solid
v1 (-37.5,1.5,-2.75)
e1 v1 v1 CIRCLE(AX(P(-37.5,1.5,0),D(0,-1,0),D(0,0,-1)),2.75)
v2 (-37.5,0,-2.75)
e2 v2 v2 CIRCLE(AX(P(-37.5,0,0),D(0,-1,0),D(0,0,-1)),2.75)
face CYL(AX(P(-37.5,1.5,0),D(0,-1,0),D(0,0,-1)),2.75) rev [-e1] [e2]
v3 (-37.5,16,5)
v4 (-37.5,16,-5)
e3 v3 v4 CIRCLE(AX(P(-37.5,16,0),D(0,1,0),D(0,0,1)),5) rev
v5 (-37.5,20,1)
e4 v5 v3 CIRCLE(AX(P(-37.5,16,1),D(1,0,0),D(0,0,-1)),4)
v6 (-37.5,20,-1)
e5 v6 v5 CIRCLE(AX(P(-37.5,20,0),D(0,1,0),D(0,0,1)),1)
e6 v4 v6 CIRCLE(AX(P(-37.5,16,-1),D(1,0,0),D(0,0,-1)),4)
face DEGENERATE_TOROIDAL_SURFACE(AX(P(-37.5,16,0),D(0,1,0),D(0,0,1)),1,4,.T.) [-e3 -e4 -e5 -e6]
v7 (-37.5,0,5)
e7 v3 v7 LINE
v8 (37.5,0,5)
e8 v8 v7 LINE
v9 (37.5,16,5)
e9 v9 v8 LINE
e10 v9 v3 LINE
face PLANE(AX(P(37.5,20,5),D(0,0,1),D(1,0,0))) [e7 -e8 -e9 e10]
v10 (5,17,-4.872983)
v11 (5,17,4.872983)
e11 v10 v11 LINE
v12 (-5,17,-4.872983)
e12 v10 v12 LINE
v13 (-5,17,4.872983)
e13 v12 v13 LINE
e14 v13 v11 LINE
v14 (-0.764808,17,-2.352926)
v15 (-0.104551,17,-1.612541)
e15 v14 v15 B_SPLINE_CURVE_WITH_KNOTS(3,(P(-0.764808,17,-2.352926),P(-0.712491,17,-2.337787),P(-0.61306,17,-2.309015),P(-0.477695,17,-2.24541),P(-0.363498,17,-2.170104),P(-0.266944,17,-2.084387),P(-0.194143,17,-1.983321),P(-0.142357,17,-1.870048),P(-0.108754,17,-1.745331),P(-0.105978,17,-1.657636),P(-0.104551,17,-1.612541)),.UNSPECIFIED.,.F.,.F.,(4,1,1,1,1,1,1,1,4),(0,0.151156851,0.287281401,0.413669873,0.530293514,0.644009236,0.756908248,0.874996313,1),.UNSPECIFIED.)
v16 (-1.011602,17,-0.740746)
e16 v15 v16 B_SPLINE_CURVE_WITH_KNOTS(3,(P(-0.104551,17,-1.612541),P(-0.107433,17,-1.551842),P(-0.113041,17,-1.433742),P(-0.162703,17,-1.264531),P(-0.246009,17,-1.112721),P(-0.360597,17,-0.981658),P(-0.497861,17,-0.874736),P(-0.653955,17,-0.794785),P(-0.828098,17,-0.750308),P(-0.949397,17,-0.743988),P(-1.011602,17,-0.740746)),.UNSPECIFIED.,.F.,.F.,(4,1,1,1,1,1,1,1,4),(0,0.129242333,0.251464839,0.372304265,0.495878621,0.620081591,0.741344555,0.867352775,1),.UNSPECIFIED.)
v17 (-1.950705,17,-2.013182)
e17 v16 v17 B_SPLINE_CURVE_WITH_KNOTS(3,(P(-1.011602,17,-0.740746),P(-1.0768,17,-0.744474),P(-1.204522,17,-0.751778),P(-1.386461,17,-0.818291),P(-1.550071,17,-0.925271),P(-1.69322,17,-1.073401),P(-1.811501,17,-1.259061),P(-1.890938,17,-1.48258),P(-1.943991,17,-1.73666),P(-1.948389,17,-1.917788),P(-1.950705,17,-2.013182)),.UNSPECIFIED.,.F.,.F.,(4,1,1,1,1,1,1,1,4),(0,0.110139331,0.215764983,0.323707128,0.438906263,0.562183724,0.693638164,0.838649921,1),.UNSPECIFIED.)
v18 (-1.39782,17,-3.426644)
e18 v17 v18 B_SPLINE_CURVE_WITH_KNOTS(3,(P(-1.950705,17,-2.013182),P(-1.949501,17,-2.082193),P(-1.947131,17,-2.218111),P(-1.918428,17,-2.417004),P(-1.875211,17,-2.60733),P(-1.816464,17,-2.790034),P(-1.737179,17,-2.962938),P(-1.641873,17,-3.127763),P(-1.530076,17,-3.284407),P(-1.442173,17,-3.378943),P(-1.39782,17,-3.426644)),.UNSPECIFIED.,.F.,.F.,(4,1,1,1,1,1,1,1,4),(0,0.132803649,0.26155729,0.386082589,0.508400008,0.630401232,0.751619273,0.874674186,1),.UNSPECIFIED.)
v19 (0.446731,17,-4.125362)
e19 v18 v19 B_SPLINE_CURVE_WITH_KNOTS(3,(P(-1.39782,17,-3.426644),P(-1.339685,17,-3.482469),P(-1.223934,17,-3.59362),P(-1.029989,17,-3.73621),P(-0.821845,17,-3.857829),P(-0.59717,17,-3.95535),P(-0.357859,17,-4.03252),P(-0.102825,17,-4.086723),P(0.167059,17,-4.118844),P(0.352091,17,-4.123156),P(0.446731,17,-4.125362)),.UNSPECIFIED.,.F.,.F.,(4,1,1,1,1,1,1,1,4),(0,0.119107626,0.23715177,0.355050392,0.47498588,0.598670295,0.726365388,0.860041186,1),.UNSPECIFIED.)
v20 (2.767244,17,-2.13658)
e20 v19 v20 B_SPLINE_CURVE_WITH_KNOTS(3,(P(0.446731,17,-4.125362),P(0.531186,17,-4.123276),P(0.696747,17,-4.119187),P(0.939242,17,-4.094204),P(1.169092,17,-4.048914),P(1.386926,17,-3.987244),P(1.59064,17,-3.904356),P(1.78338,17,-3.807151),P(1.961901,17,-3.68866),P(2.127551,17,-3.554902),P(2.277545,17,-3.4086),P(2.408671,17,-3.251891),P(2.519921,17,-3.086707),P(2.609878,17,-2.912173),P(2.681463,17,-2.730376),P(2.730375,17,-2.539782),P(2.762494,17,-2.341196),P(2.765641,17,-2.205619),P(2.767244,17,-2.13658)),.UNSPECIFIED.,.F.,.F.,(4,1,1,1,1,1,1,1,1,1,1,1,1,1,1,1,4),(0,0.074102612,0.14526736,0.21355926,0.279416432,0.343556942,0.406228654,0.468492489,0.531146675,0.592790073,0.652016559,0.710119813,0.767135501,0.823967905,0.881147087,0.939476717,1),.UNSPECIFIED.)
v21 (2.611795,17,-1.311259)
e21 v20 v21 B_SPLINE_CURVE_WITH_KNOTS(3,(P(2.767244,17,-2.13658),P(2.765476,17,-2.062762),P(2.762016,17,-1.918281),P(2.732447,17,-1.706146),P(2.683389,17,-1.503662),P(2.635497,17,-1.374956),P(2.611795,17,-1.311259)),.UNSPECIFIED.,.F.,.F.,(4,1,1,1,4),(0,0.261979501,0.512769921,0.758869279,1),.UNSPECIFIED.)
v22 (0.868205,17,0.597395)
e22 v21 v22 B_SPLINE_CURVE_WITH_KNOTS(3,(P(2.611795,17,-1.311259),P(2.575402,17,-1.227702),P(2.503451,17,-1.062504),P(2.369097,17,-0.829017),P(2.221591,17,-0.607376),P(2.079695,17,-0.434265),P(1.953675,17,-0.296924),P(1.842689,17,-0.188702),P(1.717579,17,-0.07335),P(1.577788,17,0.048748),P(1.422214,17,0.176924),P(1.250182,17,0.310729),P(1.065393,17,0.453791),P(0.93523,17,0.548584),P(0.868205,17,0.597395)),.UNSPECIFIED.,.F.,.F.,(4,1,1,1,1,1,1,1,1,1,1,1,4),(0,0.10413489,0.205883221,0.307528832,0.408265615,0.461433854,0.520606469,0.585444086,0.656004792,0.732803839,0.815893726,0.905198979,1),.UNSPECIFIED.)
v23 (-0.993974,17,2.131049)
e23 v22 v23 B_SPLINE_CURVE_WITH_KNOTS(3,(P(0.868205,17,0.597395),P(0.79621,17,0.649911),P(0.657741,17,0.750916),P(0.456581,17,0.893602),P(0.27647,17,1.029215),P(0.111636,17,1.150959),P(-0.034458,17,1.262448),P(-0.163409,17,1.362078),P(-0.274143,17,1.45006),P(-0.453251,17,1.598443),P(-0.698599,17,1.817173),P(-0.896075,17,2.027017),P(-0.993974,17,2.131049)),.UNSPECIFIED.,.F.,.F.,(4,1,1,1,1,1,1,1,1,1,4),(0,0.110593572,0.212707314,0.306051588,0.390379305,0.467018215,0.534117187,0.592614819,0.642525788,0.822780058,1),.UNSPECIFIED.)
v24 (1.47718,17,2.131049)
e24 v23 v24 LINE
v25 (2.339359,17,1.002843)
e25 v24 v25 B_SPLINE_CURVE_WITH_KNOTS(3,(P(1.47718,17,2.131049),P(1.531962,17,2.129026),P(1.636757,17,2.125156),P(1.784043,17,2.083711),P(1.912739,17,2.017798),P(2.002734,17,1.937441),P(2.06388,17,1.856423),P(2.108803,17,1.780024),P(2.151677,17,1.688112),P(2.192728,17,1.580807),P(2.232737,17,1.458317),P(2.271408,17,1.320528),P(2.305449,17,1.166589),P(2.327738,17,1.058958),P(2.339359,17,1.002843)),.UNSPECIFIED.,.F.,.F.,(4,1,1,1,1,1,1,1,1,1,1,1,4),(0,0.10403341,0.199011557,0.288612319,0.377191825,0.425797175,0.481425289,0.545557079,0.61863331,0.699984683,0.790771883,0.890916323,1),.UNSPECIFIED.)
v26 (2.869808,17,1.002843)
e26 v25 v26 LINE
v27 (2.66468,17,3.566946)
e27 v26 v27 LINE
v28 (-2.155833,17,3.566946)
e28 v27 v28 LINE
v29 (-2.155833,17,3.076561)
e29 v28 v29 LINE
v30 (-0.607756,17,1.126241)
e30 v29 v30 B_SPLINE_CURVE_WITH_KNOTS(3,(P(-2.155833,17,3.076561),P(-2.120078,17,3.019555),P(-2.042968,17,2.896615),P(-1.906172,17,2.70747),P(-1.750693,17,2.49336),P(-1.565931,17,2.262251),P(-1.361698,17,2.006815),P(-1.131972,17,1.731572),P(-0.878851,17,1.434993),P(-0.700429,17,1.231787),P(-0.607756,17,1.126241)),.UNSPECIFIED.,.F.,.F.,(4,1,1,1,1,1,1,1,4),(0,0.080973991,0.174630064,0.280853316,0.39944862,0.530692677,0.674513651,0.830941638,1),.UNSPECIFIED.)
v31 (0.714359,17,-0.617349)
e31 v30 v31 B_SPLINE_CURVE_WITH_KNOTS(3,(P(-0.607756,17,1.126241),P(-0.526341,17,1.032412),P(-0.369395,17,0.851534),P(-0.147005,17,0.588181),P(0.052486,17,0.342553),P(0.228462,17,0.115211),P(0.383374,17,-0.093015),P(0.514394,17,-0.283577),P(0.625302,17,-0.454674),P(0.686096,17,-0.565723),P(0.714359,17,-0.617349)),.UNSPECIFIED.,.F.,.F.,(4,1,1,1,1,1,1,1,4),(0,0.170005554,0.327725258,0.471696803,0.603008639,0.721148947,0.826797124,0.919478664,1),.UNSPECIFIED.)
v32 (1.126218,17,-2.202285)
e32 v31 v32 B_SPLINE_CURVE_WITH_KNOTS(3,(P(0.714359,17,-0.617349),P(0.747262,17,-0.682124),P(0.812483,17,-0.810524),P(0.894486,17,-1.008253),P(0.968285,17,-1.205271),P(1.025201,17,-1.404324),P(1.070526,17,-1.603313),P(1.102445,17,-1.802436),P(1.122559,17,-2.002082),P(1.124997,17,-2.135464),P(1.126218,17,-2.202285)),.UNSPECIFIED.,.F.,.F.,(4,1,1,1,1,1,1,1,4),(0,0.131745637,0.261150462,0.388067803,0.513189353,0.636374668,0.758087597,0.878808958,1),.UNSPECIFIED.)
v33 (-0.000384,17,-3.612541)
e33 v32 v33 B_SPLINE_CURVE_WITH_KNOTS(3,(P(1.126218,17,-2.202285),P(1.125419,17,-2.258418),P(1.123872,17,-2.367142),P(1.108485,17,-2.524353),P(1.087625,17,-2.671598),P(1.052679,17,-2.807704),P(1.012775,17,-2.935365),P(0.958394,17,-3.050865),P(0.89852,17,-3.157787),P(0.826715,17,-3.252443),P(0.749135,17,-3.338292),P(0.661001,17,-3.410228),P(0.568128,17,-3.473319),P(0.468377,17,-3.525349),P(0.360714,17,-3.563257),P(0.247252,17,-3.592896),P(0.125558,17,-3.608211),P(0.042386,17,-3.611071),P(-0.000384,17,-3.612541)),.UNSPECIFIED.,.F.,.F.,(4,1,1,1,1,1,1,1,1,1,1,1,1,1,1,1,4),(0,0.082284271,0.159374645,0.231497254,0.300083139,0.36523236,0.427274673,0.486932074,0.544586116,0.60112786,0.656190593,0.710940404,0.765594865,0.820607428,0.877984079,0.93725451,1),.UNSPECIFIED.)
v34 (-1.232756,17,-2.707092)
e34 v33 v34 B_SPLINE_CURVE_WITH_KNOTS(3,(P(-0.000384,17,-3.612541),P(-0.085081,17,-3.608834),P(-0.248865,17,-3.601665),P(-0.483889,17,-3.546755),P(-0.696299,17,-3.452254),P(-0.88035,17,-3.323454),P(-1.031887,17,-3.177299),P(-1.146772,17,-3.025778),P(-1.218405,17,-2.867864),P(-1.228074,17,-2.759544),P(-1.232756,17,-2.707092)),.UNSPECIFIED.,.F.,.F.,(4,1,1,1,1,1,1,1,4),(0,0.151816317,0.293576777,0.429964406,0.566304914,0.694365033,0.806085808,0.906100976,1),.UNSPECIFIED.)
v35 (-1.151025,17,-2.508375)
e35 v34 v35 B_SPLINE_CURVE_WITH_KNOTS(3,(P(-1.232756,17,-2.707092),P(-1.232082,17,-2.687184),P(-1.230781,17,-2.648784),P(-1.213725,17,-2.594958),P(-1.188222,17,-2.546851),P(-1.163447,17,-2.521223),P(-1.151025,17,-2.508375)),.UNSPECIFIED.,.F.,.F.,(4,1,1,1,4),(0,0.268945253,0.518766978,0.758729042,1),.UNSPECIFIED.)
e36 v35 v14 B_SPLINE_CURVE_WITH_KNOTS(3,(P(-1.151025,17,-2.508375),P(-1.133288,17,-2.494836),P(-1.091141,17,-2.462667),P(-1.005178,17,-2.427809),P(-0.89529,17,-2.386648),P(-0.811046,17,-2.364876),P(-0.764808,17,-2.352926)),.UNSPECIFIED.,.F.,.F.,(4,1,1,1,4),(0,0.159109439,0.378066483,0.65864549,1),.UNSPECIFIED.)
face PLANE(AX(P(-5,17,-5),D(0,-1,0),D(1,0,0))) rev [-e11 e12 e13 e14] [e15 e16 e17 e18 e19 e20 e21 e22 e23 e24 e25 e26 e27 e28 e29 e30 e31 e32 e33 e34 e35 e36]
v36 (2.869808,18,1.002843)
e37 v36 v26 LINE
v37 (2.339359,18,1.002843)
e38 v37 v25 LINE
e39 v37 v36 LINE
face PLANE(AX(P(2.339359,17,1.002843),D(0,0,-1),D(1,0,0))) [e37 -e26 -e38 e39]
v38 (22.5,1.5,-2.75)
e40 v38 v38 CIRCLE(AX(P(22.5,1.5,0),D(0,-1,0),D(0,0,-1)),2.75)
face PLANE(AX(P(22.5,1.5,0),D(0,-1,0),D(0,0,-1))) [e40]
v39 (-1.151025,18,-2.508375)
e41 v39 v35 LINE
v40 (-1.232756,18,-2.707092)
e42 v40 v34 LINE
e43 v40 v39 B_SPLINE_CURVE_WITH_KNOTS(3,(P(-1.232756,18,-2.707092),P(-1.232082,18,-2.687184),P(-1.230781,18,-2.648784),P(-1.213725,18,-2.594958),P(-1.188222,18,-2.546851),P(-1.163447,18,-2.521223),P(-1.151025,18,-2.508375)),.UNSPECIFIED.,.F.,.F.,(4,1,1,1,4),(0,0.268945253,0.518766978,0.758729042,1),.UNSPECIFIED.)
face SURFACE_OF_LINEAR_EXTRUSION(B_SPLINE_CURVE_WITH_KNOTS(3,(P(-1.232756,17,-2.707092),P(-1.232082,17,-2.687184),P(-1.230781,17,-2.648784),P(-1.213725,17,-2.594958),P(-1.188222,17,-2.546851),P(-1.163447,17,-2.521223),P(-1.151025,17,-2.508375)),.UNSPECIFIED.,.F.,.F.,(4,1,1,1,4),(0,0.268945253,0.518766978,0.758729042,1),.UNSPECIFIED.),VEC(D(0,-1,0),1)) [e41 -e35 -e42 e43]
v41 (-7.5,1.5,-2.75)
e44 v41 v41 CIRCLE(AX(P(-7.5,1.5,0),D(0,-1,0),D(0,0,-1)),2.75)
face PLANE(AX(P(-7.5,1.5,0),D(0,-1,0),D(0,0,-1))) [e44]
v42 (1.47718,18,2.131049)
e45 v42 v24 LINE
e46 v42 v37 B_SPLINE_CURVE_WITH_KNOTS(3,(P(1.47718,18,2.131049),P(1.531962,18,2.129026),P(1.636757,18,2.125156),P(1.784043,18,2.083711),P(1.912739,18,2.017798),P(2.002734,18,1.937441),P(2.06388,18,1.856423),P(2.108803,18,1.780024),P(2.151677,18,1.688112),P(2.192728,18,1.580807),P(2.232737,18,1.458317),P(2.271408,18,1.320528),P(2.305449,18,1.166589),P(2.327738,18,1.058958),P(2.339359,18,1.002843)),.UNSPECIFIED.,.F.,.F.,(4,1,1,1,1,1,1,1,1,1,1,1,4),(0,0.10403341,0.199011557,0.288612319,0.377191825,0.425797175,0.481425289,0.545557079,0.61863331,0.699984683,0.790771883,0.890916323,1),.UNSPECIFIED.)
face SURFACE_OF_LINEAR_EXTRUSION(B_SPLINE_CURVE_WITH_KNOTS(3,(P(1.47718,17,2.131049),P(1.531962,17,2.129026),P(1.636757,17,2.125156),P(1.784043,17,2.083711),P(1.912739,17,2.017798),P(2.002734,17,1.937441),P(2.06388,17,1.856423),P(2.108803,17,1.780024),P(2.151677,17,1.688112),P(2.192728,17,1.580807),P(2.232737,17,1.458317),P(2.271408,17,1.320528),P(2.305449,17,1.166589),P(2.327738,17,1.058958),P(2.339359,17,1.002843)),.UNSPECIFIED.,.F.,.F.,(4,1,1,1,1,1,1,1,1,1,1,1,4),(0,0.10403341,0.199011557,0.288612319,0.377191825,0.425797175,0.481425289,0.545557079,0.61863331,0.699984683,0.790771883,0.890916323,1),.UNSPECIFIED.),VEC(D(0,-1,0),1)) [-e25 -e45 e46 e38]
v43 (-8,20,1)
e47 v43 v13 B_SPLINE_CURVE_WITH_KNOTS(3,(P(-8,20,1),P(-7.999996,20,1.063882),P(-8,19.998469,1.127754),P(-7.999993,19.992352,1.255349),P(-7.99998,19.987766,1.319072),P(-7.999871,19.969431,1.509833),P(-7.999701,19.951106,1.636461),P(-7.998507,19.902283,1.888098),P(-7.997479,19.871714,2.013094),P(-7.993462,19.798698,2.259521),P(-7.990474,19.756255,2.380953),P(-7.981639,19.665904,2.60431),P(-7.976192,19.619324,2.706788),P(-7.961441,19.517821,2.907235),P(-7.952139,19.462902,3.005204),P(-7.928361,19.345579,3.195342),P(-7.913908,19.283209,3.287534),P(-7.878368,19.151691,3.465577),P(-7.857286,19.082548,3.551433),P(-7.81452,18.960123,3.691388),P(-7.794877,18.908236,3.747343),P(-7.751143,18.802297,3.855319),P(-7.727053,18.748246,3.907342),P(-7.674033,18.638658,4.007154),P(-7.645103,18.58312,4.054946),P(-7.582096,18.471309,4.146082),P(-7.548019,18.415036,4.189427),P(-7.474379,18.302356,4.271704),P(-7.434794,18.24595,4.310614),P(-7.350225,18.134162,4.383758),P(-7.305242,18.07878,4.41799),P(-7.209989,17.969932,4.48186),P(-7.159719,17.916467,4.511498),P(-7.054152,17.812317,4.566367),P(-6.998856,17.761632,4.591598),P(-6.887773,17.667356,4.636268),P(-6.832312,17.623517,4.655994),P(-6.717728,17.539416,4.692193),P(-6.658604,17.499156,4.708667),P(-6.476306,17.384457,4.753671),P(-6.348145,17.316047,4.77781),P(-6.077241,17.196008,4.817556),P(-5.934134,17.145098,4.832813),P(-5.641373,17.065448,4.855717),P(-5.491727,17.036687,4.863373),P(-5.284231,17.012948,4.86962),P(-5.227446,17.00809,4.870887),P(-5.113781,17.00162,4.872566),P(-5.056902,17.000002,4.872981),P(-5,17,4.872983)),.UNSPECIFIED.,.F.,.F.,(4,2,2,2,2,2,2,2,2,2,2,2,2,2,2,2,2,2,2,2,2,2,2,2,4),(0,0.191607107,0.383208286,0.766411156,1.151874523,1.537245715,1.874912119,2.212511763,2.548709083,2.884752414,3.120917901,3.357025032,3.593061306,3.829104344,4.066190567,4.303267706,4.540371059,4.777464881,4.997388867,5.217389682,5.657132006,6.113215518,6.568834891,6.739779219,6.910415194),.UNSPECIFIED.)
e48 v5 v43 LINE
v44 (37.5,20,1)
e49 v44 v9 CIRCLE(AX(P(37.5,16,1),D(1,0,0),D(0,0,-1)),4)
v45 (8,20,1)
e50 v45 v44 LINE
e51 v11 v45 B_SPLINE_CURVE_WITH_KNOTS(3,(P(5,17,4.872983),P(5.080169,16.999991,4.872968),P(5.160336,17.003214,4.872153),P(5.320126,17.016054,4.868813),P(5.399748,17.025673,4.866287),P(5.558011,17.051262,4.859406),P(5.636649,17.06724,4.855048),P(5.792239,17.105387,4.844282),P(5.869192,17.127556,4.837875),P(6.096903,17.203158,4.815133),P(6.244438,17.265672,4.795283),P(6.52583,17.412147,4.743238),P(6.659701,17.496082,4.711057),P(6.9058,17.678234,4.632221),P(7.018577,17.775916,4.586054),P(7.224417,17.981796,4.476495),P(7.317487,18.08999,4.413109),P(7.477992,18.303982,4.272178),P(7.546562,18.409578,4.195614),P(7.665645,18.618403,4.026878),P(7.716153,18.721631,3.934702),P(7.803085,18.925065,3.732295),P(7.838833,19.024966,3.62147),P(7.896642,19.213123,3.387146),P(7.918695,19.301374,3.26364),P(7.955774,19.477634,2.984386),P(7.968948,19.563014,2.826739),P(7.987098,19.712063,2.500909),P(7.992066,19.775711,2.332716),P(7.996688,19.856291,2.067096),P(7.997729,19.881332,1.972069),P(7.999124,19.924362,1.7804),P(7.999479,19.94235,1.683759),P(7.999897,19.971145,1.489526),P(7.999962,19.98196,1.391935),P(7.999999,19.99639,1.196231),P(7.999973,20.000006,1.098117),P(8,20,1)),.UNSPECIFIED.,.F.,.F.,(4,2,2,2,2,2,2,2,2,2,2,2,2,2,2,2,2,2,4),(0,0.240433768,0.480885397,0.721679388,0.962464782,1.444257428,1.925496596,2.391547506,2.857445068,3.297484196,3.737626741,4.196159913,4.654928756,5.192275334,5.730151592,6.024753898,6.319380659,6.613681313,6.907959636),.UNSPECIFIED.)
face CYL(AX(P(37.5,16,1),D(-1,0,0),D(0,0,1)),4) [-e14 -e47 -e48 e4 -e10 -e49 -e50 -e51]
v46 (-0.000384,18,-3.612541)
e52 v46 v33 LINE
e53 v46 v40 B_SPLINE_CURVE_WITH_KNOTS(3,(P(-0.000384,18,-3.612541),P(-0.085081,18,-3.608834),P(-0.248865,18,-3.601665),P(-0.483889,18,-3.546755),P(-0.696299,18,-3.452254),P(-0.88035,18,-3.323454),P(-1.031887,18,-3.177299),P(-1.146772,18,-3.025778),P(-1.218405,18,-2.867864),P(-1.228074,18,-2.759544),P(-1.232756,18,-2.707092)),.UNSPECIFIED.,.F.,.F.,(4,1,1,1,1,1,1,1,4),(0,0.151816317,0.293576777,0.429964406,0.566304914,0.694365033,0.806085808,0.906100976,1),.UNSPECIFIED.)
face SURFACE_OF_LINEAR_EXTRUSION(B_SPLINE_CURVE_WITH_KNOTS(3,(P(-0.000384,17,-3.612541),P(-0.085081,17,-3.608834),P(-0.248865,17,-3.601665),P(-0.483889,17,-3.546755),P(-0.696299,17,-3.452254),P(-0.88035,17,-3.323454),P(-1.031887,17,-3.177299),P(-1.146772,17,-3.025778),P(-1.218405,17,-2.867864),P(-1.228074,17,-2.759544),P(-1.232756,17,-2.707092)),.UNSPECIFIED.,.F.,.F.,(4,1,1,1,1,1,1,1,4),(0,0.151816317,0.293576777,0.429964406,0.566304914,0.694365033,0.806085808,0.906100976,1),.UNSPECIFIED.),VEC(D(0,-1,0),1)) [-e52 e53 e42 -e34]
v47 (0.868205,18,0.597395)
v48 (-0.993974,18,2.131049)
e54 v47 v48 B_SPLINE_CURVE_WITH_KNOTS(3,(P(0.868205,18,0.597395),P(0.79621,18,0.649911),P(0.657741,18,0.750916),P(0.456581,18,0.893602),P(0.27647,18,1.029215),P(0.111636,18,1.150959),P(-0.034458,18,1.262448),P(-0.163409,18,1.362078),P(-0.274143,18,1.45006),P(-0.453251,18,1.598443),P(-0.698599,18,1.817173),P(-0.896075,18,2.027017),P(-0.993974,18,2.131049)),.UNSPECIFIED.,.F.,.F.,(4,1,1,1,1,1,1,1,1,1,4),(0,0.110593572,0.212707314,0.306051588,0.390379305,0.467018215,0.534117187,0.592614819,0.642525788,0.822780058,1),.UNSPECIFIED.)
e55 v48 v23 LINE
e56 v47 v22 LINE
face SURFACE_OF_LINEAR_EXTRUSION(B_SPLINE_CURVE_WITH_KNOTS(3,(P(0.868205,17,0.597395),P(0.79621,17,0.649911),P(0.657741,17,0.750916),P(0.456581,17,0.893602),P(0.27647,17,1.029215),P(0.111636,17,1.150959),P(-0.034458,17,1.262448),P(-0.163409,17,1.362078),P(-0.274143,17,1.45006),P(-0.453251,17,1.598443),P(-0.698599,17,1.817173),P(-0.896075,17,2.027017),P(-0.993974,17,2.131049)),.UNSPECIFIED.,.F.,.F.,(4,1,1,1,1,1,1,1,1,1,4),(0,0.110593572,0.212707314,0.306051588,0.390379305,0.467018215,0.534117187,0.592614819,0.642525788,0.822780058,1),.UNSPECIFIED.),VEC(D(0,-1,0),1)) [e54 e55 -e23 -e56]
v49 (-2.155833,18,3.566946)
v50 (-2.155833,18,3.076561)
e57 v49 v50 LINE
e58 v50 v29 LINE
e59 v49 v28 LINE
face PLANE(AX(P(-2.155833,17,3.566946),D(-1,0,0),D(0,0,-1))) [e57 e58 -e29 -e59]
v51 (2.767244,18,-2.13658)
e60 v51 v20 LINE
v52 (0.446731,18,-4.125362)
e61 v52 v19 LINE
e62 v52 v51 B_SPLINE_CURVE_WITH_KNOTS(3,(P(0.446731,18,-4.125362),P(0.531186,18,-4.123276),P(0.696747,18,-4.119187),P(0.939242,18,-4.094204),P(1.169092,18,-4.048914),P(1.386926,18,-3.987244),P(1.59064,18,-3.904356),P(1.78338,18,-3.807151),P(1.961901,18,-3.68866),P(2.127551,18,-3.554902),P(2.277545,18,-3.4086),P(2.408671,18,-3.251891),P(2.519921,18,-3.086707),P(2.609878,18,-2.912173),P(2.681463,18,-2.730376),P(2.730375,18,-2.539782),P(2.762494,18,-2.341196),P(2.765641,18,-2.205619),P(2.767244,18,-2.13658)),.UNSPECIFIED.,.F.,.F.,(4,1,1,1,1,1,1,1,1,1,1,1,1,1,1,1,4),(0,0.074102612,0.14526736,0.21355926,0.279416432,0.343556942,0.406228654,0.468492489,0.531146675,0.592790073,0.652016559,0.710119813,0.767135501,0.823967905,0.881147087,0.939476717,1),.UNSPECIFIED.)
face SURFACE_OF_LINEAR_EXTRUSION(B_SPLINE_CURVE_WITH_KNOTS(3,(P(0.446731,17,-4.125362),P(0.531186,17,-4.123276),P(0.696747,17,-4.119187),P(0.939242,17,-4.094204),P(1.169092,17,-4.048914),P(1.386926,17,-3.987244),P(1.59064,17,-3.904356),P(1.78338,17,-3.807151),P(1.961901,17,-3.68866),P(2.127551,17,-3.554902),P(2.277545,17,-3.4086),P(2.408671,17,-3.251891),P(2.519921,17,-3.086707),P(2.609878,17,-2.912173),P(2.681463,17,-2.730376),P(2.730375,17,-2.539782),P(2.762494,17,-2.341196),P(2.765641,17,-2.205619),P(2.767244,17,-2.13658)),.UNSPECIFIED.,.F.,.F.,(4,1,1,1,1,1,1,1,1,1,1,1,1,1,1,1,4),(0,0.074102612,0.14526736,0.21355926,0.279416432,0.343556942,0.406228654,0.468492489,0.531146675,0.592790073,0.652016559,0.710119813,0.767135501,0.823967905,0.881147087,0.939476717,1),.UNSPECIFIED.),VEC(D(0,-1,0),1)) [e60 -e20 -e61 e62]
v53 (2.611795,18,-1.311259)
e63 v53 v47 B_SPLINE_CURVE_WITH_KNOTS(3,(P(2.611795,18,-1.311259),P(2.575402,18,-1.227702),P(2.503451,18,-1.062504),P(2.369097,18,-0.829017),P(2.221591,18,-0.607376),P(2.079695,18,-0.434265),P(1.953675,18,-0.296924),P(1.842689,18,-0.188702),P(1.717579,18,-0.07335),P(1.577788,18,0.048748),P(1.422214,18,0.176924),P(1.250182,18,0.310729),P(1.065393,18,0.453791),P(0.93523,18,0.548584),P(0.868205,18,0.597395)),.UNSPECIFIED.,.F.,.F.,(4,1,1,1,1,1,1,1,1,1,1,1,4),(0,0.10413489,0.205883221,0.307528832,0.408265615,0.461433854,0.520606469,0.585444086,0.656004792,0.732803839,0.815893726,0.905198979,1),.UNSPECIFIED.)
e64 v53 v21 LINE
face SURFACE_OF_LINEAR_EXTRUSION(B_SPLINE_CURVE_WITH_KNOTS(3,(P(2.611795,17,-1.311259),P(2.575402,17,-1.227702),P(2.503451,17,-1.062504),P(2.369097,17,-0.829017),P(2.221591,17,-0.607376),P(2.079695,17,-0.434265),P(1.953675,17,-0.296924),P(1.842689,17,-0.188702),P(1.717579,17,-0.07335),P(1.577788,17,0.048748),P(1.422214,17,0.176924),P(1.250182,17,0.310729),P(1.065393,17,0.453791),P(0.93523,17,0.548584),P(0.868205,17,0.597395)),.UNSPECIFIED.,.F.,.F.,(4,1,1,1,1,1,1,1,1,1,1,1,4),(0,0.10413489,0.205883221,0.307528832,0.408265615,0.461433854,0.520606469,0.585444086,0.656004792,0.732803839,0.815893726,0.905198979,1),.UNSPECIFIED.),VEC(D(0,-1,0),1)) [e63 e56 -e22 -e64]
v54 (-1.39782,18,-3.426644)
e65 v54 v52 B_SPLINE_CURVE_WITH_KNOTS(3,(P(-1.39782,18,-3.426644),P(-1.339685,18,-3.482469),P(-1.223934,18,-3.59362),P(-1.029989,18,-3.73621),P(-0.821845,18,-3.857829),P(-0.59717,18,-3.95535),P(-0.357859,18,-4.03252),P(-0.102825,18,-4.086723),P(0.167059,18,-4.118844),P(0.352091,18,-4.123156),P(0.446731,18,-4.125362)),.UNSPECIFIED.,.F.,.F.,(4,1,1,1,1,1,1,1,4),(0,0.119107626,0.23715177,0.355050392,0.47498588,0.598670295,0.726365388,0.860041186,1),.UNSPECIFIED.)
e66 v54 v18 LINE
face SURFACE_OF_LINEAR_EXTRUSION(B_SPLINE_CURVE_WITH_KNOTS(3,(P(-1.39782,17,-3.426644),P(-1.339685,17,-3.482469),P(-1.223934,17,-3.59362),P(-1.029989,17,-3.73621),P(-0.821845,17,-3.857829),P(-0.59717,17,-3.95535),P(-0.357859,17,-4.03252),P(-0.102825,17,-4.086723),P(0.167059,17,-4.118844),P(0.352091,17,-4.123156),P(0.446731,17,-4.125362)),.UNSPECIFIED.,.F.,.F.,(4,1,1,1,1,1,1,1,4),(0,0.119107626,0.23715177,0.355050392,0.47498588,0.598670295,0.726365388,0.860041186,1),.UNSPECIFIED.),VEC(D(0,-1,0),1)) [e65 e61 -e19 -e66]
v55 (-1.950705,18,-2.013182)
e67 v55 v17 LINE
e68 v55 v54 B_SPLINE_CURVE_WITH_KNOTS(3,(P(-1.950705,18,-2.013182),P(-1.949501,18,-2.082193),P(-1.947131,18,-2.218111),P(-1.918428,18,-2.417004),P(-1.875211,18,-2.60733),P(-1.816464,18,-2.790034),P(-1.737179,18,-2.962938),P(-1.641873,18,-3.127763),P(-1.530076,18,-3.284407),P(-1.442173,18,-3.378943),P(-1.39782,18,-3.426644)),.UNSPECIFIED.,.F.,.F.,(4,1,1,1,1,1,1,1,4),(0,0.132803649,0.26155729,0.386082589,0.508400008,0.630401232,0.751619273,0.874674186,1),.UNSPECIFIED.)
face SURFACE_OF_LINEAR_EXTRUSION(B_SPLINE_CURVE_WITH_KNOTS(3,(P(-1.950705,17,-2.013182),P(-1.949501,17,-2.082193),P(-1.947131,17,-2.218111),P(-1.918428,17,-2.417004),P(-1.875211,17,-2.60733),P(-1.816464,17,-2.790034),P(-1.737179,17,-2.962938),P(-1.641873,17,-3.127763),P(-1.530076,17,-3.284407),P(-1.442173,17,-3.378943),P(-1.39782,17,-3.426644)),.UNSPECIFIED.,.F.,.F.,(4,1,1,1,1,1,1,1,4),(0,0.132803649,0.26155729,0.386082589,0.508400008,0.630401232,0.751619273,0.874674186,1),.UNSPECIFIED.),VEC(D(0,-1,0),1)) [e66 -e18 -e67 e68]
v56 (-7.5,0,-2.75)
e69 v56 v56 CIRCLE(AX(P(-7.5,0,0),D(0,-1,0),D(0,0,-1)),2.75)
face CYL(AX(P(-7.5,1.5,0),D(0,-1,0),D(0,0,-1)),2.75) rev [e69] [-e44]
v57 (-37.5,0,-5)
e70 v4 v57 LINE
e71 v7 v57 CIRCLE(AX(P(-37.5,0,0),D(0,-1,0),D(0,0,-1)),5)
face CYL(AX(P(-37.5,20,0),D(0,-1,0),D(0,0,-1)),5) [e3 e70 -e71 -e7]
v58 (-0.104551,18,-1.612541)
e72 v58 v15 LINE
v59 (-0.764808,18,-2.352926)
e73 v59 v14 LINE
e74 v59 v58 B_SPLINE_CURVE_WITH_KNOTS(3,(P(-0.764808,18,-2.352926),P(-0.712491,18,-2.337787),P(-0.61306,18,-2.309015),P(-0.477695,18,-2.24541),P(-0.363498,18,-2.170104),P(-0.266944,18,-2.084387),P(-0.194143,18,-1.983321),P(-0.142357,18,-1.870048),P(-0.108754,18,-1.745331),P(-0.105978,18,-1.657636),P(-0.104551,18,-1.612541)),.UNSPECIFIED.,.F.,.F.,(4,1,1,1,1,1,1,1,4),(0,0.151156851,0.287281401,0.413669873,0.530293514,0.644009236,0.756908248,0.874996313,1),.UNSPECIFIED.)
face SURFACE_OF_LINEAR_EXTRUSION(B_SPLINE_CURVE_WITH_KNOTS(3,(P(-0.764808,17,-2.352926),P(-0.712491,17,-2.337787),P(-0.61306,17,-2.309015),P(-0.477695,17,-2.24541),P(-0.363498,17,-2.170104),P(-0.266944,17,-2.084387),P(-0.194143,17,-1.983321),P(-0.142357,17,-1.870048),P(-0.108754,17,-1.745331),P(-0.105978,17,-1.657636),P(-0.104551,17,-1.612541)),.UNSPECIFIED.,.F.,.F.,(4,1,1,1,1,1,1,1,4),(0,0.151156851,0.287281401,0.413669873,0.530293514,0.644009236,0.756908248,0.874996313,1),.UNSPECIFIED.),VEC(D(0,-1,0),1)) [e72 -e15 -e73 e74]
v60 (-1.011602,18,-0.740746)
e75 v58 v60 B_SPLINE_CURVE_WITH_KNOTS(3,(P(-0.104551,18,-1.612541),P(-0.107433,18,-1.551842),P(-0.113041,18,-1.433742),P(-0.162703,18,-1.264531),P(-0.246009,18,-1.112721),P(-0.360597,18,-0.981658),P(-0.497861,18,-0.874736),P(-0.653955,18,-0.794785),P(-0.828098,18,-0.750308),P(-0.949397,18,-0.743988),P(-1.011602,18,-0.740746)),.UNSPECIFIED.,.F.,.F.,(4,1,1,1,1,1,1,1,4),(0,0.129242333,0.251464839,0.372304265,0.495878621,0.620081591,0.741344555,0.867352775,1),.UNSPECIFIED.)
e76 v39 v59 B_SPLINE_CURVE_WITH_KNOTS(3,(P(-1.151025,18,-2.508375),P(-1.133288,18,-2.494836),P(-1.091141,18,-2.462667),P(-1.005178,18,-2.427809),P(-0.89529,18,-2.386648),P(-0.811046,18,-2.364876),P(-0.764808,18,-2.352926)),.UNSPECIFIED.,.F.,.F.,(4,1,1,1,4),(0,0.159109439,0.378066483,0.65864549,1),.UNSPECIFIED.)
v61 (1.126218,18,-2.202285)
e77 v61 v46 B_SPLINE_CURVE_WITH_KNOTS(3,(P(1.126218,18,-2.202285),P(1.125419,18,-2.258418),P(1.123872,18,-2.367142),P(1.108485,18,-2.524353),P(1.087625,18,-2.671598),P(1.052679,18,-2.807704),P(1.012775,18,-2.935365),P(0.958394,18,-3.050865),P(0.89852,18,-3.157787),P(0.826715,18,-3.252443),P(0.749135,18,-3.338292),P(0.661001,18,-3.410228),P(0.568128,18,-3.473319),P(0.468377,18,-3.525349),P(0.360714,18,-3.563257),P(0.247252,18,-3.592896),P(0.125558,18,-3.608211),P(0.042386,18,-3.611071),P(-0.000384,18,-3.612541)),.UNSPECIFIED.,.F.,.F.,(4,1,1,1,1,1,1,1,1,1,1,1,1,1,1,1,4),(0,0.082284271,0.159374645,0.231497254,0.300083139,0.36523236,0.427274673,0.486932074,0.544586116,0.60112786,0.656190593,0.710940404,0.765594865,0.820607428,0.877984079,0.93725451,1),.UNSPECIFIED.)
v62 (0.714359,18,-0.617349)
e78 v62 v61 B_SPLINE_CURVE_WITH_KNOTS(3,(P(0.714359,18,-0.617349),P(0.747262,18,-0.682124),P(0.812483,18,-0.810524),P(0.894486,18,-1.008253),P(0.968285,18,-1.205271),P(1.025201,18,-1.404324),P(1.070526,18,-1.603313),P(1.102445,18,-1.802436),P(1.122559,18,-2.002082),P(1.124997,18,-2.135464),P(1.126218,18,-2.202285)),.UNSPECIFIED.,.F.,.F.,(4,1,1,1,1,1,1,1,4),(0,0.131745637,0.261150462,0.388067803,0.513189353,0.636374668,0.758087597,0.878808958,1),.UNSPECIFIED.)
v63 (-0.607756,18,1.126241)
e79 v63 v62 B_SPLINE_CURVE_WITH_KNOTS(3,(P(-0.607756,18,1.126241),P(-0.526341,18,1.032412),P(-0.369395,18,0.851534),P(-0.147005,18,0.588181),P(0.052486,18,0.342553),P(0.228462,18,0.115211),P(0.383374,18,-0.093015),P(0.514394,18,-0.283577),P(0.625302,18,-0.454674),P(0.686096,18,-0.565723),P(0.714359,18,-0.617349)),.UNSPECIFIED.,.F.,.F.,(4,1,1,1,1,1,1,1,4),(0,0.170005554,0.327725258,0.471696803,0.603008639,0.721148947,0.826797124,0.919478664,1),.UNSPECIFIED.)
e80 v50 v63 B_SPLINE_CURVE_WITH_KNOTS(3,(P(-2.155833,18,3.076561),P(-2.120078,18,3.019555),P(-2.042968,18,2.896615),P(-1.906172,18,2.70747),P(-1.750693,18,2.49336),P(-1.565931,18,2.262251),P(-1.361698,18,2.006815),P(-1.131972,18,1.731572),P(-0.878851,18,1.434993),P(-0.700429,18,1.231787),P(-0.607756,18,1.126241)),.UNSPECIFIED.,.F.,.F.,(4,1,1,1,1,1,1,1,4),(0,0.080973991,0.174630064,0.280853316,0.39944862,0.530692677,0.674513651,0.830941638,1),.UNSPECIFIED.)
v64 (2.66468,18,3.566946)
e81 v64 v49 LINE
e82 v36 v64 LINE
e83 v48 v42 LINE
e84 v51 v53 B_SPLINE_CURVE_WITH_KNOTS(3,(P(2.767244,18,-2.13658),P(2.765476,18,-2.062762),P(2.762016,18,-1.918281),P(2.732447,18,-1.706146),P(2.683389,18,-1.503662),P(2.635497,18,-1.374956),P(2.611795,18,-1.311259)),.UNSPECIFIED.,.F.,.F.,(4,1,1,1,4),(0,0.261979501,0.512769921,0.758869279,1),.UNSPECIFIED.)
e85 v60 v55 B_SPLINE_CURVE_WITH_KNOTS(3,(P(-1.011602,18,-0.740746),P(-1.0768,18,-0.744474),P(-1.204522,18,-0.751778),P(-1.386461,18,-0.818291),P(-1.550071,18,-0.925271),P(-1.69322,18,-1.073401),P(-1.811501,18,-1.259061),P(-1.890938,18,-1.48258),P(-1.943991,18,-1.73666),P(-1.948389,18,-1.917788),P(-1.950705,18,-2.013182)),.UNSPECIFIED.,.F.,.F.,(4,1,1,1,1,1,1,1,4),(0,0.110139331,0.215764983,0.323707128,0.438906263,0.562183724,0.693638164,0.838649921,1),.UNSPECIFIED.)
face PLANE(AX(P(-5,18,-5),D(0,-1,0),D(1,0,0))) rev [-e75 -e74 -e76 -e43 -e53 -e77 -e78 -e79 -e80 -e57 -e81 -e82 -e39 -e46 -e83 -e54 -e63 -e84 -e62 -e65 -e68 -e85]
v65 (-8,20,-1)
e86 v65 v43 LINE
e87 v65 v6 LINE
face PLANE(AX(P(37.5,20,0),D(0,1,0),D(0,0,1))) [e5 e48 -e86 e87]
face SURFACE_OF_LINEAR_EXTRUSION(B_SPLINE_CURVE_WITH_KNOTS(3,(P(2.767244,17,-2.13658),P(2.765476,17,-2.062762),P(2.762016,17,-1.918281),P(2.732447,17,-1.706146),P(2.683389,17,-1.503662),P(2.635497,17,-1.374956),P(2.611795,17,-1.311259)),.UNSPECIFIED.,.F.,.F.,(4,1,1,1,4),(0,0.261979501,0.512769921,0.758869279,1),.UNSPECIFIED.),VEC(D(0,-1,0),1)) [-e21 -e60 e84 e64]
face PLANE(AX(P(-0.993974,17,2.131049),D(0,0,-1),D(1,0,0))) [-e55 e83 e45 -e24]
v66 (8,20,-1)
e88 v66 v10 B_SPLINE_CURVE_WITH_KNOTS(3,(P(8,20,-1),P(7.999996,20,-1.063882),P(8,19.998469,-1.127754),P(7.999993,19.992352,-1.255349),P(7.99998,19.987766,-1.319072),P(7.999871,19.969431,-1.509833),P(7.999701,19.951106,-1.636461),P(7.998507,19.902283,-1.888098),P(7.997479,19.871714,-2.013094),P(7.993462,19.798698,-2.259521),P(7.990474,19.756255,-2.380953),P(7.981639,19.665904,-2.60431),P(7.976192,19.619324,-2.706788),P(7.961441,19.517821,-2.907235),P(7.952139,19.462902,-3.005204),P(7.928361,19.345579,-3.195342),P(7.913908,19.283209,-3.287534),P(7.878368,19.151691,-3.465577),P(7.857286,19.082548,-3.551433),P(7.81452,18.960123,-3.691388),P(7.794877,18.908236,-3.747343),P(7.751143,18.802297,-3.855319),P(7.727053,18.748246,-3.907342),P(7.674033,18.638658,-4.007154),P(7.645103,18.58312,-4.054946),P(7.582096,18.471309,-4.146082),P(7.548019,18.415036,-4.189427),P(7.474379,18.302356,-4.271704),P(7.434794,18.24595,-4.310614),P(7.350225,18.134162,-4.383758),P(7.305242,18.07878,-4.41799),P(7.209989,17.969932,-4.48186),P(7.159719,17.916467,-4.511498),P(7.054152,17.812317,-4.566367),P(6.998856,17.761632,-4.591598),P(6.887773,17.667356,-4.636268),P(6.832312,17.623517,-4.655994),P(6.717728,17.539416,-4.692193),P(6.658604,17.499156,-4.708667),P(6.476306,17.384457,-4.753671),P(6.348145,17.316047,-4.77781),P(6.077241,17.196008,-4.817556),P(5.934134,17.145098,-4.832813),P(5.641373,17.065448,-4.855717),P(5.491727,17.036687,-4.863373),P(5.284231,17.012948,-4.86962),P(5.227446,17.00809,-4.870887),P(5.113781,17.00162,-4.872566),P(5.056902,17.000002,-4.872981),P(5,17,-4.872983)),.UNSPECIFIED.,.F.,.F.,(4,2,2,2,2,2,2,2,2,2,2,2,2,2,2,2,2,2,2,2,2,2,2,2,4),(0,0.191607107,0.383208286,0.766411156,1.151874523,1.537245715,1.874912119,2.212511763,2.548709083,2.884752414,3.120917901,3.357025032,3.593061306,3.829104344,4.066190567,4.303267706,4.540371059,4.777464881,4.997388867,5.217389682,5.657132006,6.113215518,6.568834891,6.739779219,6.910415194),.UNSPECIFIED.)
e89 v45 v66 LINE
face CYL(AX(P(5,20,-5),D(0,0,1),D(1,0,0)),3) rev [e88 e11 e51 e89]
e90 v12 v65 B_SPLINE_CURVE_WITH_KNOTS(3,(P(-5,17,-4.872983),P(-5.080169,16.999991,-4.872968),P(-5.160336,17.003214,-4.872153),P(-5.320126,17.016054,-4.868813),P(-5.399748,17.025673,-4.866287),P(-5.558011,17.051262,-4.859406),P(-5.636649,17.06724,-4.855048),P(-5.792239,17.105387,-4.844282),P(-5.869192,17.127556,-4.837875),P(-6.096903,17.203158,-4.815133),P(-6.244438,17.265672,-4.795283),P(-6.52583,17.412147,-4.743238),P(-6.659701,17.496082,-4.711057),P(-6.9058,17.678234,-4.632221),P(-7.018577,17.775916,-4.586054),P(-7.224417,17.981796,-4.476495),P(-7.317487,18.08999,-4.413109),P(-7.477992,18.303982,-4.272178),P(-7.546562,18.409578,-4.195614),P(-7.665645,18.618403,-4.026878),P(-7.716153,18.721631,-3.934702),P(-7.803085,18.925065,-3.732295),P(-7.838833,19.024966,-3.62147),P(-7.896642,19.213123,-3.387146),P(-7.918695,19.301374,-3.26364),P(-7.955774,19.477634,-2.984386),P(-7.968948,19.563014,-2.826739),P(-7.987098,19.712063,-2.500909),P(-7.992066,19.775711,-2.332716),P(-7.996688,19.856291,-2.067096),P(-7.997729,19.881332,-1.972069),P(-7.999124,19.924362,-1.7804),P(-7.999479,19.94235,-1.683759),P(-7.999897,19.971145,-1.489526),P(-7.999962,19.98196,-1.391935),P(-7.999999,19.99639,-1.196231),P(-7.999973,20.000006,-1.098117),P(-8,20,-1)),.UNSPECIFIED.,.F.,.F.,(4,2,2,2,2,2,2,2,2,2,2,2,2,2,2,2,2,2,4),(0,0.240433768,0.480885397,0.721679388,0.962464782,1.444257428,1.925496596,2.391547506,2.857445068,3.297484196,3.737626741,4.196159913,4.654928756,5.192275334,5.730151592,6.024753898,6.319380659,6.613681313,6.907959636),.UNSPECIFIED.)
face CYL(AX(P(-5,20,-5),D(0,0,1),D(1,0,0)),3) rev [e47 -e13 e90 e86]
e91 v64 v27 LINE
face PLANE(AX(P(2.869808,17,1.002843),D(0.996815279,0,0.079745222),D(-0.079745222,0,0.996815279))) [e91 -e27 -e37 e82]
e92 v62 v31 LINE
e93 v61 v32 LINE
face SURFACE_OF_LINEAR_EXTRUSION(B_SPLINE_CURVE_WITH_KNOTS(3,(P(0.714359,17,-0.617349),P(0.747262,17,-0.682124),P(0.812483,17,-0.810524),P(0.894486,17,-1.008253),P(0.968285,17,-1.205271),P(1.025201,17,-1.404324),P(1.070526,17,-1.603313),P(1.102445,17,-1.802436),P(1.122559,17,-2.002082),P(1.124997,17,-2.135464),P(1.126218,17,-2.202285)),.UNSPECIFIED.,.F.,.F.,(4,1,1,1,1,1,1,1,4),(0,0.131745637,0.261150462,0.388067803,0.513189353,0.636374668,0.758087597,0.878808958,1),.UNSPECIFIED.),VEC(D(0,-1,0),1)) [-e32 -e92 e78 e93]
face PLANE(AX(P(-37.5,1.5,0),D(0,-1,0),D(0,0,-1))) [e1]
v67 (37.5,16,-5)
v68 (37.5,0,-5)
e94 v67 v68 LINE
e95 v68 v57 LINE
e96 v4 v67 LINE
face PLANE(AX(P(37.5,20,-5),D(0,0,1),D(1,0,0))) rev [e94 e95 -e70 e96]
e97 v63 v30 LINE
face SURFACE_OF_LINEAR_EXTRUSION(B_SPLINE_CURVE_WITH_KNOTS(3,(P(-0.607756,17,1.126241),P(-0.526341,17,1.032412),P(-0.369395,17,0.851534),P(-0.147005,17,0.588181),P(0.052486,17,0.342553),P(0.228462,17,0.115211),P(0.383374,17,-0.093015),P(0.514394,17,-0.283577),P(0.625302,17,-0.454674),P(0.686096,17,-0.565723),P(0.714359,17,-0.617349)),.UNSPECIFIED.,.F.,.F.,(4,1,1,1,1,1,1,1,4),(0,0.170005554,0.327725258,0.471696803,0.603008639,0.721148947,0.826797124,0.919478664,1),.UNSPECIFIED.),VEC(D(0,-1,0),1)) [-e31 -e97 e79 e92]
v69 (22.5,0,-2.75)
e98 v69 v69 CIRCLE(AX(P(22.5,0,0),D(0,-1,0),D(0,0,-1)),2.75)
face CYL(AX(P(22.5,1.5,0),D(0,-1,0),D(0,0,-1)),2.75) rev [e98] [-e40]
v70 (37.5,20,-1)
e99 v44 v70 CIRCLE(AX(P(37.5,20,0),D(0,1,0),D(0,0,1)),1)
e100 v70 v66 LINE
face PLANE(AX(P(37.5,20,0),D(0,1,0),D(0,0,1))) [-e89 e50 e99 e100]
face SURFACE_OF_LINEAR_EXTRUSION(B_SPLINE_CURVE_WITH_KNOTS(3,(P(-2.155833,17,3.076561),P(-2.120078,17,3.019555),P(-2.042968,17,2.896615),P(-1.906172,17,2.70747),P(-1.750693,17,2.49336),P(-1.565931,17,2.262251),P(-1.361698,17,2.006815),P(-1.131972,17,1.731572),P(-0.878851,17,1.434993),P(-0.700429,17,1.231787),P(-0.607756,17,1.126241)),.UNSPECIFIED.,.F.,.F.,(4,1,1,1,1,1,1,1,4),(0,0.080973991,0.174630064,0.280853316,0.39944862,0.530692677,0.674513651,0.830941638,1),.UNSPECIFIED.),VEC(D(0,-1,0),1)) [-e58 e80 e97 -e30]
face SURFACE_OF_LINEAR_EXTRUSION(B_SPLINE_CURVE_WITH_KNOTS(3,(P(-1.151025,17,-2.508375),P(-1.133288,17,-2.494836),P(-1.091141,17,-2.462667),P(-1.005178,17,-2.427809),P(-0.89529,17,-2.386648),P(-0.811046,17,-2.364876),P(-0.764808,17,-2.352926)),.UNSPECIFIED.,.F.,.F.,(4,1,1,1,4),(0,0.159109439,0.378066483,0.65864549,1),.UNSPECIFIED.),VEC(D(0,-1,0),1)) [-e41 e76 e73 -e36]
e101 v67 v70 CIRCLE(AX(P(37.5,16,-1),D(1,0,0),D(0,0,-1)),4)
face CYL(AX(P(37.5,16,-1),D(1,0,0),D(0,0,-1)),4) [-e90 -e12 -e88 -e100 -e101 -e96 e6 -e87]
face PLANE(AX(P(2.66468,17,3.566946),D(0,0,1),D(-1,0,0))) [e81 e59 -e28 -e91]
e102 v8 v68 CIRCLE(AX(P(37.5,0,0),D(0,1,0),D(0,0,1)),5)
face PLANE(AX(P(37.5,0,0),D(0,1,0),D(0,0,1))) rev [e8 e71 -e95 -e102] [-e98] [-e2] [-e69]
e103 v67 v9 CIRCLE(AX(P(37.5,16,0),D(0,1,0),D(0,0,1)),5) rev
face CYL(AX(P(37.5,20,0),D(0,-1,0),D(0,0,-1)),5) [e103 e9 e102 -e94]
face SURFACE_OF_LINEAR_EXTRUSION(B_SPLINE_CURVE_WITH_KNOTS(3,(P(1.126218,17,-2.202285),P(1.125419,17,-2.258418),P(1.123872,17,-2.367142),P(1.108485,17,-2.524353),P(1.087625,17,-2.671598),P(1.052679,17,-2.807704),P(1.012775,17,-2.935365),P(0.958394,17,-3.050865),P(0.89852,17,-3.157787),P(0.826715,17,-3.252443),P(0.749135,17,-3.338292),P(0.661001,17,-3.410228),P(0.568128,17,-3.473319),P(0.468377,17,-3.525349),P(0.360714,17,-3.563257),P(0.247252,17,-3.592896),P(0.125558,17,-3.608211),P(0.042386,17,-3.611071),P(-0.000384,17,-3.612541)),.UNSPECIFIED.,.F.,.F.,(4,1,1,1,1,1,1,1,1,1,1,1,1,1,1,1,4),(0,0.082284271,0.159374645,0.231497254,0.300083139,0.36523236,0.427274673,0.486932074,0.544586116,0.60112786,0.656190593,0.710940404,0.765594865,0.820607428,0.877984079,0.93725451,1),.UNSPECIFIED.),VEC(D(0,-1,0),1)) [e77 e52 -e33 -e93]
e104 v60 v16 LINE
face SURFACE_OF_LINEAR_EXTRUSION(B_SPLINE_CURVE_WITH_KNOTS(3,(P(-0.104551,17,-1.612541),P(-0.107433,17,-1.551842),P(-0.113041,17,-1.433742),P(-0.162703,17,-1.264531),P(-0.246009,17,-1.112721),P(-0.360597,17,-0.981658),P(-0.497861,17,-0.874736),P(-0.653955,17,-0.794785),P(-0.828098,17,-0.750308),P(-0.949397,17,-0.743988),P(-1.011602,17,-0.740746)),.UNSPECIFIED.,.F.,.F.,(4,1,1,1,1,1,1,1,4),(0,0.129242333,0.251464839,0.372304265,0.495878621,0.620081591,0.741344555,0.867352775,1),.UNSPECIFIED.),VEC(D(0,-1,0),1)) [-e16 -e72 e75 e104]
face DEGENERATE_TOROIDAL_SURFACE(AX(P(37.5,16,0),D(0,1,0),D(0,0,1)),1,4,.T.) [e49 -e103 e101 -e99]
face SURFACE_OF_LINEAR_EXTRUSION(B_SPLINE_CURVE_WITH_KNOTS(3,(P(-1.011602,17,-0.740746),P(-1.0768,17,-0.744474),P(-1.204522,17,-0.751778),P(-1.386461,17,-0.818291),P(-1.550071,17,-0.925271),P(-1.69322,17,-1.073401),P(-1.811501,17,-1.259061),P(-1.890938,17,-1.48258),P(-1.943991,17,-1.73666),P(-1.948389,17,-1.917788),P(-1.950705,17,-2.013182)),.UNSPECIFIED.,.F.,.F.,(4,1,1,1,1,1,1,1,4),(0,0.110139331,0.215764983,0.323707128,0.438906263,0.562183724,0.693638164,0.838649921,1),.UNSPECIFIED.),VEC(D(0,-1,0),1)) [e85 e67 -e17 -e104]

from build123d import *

# Parameters (mm, degrees)
BOSS_EXTRUDE1_DEPTH     = 20
FILLET1_R               = 4
SKETCH2_R               = 2.75
CUT_EXTRUDE1_DEPTH      = 1.5
LPATTERN1_COUNT         = 3
LPATTERN1_PITCH         = 30
CUT_EXTRUDE2_DEPTH      = 48.236109069
CUT_EXTRUDE2_DEPTH_BACK = 48.236109069
WRAP1_DEPTH             = 1


# Read off the part's stored shape, not the designer's step: Wrap1
with BuildPart() as part:
    # Sketch1 → Boss-Extrude1 (new body)
    with BuildSketch(Plane(origin=(0, 0, 0), x_dir=(1, 0, 0), z_dir=(0, 1, 0))):
        with BuildLine():
            Line((37.5, -5), (-37.5, -5))
            ThreePointArc((-37.5, -5), (-42.5, 0), (-37.5, 5))
            Line((-37.5, 5), (37.5, 5))
            ThreePointArc((37.5, 5), (42.5, 0), (37.5, -5))
        make_face()
    extrude(amount=BOSS_EXTRUDE1_DEPTH)

    # Fillet1
    fillet1_edges = [part.edges().sort_by_distance(p)[0] for p in [
        (-42.5, 20, 0),
        (0, 20, 5),
        (42.5, 20, 0),
        (0, 20, -5),
    ]]
    fillet(fillet1_edges, radius=FILLET1_R)

    # Sketch2 → Cut-Extrude1 (cut)
    with BuildSketch(Plane.XZ):
        with Locations(Location((-37.5, 0, 0), (0, 0, 270))):
            Circle(SKETCH2_R)
    cut_extrude1 = extrude(amount=-CUT_EXTRUDE1_DEPTH, mode=Mode.SUBTRACT)

    # LPattern1: Cut-Extrude1 ×3
    with Locations(*[(i * LPATTERN1_PITCH, 0, 0) for i in range(1, LPATTERN1_COUNT)]):
        add(cut_extrude1, mode=Mode.SUBTRACT)

    # Sketch3 → Cut-Extrude2 (cut, two sides: drawn at the far end of the back side and taken through both)
    with BuildSketch(Plane.XY.offset(-CUT_EXTRUDE2_DEPTH_BACK)):
        with BuildLine():
            Line((-5, 23), (5, 23))
            ThreePointArc((5, 23), (8, 20), (5, 17))
            Line((5, 17), (-5, 17))
            ThreePointArc((-5, 17), (-8, 20), (-5, 23))
        make_face()
    extrude(amount=CUT_EXTRUDE2_DEPTH + CUT_EXTRUDE2_DEPTH_BACK, mode=Mode.SUBTRACT)

    # Wrap1 outline → Wrap1 (add)
    with BuildSketch(Plane(origin=(0, 17, 0), x_dir=(1, 0, 0), z_dir=(0, 1, 0))):
        with BuildLine():
            add(Edge.make_bspline(
                [(1.477179672, -2.131048558), (1.531961531, -2.129025799), (1.636756934, -2.125156347), (1.784042683, -2.083710764), (1.912739128, -2.017798162), (2.002734413, -1.937441096), (2.063880351, -1.856422731), (2.108803156, -1.780024303), (2.151677105, -1.688112446), (2.192727948, -1.580807318), (2.232736726, -1.458316815), (2.27140835, -1.320528166), (2.305449427, -1.166588854), (2.327738483, -1.058958074), (2.339359159, -1.00284343)],
                knots=[0, 0, 0, 0, 0.10403341, 0.199011557, 0.288612319, 0.377191825, 0.425797175, 0.481425289, 0.545557079, 0.61863331, 0.699984683, 0.790771883, 0.890916323, 1, 1, 1, 1], degree=3))
            Line((1.477179672, -2.131048558), (-0.993974174, -2.131048558))
            add(Edge.make_bspline(
                [(0.868205313, -0.597394712), (0.79621048, -0.649910777), (0.657741061, -0.750916207), (0.456580944, -0.893601927), (0.27646951, -1.029215281), (0.111636193, -1.150958881), (-0.034458066, -1.262447791), (-0.163409095, -1.362077669), (-0.274143139, -1.450060052), (-0.45325139, -1.598443158), (-0.698599089, -1.817172559), (-0.896074552, -2.027016962), (-0.993974174, -2.131048558)],
                knots=[0, 0, 0, 0, 0.110593572, 0.212707314, 0.306051588, 0.390379305, 0.467018215, 0.534117187, 0.592614819, 0.642525788, 0.822780058, 1, 1, 1, 1], degree=3))
            add(Edge.make_bspline(
                [(2.611795057, 1.311259134), (2.575402231, 1.227702286), (2.503450629, 1.062503542), (2.369097378, 0.829017261), (2.221591228, 0.607376082), (2.079695352, 0.434265273), (1.953675403, 0.296924311), (1.842689454, 0.188702281), (1.717579256, 0.073349805), (1.577787564, -0.048748331), (1.422213899, -0.176924213), (1.250181802, -0.310729341), (1.06539278, -0.453791096), (0.935229638, -0.548583621), (0.868205313, -0.597394712)],
                knots=[0, 0, 0, 0, 0.10413489, 0.205883221, 0.307528832, 0.408265615, 0.461433854, 0.520606469, 0.585444086, 0.656004792, 0.732803839, 0.815893726, 0.905198979, 1, 1, 1, 1], degree=3))
            add(Edge.make_bspline(
                [(2.767243775, 2.136579647), (2.765476042, 2.062762359), (2.762016076, 1.918280503), (2.73244702, 1.70614551), (2.6833885, 1.503661888), (2.635496742, 1.374955883), (2.611795057, 1.311259134)],
                knots=[0, 0, 0, 0, 0.261979501, 0.512769921, 0.758869279, 1, 1, 1, 1], degree=3))
            add(Edge.make_bspline(
                [(0.446730954, 4.125361698), (0.531185697, 4.123275975), (0.696746898, 4.119187219), (0.939241519, 4.094203646), (1.169092432, 4.04891417), (1.386926246, 3.987244257), (1.590639541, 3.904356397), (1.783380165, 3.807151368), (1.961901465, 3.688660444), (2.12755051, 3.554901637), (2.277544806, 3.408600033), (2.408670906, 3.251890691), (2.519920579, 3.086706843), (2.609878279, 2.912173499), (2.68146261, 2.730376132), (2.730374873, 2.539782347), (2.762493821, 2.341195944), (2.765641094, 2.205619187), (2.767243775, 2.136579647)],
                knots=[0, 0, 0, 0, 0.074102612, 0.14526736, 0.21355926, 0.279416432, 0.343556942, 0.406228654, 0.468492489, 0.531146675, 0.592790073, 0.652016559, 0.710119813, 0.767135501, 0.823967905, 0.881147087, 0.939476717, 1, 1, 1, 1], degree=3))
            add(Edge.make_bspline(
                [(-1.397820328, 3.42664375), (-1.339685121, 3.482468658), (-1.223933781, 3.593620027), (-1.029988725, 3.73621049), (-0.821845174, 3.857829356), (-0.597170186, 3.955349696), (-0.357859278, 4.032519936), (-0.102825371, 4.086723136), (0.167059066, 4.118844208), (0.3520908, 4.123156198), (0.446730954, 4.125361698)],
                knots=[0, 0, 0, 0, 0.119107626, 0.23715177, 0.355050392, 0.47498588, 0.598670295, 0.726365388, 0.860041186, 1, 1, 1, 1], degree=3))
            add(Edge.make_bspline(
                [(-1.950704943, 2.013182211), (-1.949501261, 2.082193438), (-1.947130604, 2.218111311), (-1.918428152, 2.417004203), (-1.875210504, 2.607330065), (-1.816463805, 2.790033991), (-1.737178724, 2.962937631), (-1.641872629, 3.127763446), (-1.530076028, 3.284407224), (-1.442173454, 3.378943465), (-1.397820328, 3.42664375)],
                knots=[0, 0, 0, 0, 0.132803649, 0.26155729, 0.386082589, 0.508400008, 0.630401232, 0.751619273, 0.874674186, 1, 1, 1, 1], degree=3))
            add(Edge.make_bspline(
                [(-1.011602379, 0.740746314), (-1.076799531, 0.74447446), (-1.204521956, 0.751777966), (-1.386461074, 0.818290605), (-1.550070508, 0.925271117), (-1.69322001, 1.073400563), (-1.811500845, 1.259061279), (-1.890938186, 1.482580071), (-1.943991337, 1.736660149), (-1.9483889, 1.917788326), (-1.950704943, 2.013182211)],
                knots=[0, 0, 0, 0, 0.110139331, 0.215764983, 0.323707128, 0.438906263, 0.562183724, 0.693638164, 0.838649921, 1, 1, 1, 1], degree=3))
            add(Edge.make_bspline(
                [(-0.104551097, 1.612541186), (-0.107433277, 1.55184237), (-0.113041089, 1.433741609), (-0.162702617, 1.264530911), (-0.246008733, 1.112720856), (-0.36059696, 0.981658482), (-0.497861102, 0.874736466), (-0.653954588, 0.794785259), (-0.828098239, 0.750308211), (-0.94939653, 0.74398769), (-1.011602379, 0.740746314)],
                knots=[0, 0, 0, 0, 0.129242333, 0.251464839, 0.372304265, 0.495878621, 0.620081591, 0.741344555, 0.867352775, 1, 1, 1, 1], degree=3))
            add(Edge.make_bspline(
                [(-0.764807507, 2.352925801), (-0.712490789, 2.337787093), (-0.613060164, 2.309015197), (-0.477694691, 2.245410486), (-0.363497683, 2.17010385), (-0.266944344, 2.084386734), (-0.194142589, 1.983320843), (-0.142356861, 1.870047676), (-0.108753882, 1.745331032), (-0.105978345, 1.657636068), (-0.104551097, 1.612541186)],
                knots=[0, 0, 0, 0, 0.151156851, 0.287281401, 0.413669873, 0.530293514, 0.644009236, 0.756908248, 0.874996313, 1, 1, 1, 1], degree=3))
            add(Edge.make_bspline(
                [(-1.151025456, 2.508374519), (-1.133287913, 2.494836068), (-1.091141008, 2.462666798), (-1.005178361, 2.42780874), (-0.895290257, 2.386647547), (-0.811045884, 2.364875571), (-0.764807507, 2.352925801)],
                knots=[0, 0, 0, 0, 0.159109439, 0.378066483, 0.65864549, 1, 1, 1, 1], degree=3))
            add(Edge.make_bspline(
                [(-1.232756225, 2.707092468), (-1.232081899, 2.687184305), (-1.230781196, 2.648783562), (-1.21372537, 2.594957911), (-1.188222188, 2.546850656), (-1.163446829, 2.521223132), (-1.151025456, 2.508374519)],
                knots=[0, 0, 0, 0, 0.268945253, 0.518766978, 0.758729042, 1, 1, 1, 1], degree=3))
            add(Edge.make_bspline(
                [(-0.00038443, 3.612541186), (-0.085081224, 3.608833937), (-0.24886475, 3.601664997), (-0.483889311, 3.546755047), (-0.696299395, 3.452253769), (-0.880349687, 3.323453619), (-1.031886602, 3.177298589), (-1.146772165, 3.025778423), (-1.218404743, 2.867863556), (-1.228074056, 2.759544014), (-1.232756225, 2.707092468)],
                knots=[0, 0, 0, 0, 0.151816317, 0.293576777, 0.429964406, 0.566304914, 0.694365033, 0.806085808, 0.906100976, 1, 1, 1, 1], degree=3))
            add(Edge.make_bspline(
                [(1.126218134, 2.202284775), (1.125419382, 2.258418172), (1.123872297, 2.367141747), (1.108484739, 2.524352927), (1.087625139, 2.671598252), (1.052679442, 2.807704167), (1.012774581, 2.935365364), (0.958393781, 3.050865278), (0.898520263, 3.157786792), (0.826714952, 3.252443042), (0.749134805, 3.338292119), (0.661001364, 3.410228111), (0.568127793, 3.473318886), (0.468377407, 3.525349279), (0.360714304, 3.563257103), (0.247252366, 3.592895766), (0.125557638, 3.608210727), (0.042385847, 3.61107055), (-0.00038443, 3.612541186)],
                knots=[0, 0, 0, 0, 0.082284271, 0.159374645, 0.231497254, 0.300083139, 0.36523236, 0.427274673, 0.486932074, 0.544586116, 0.60112786, 0.656190593, 0.710940404, 0.765594865, 0.820607428, 0.877984079, 0.93725451, 1, 1, 1, 1], degree=3))
            add(Edge.make_bspline(
                [(0.714359159, 0.617348878), (0.747261882, 0.682124329), (0.812482722, 0.810524323), (0.894486195, 1.008253415), (0.968284969, 1.205271239), (1.025200713, 1.404323571), (1.07052621, 1.603312874), (1.102444977, 1.802435759), (1.122559216, 2.002082393), (1.124996917, 2.135464326), (1.126218134, 2.202284775)],
                knots=[0, 0, 0, 0, 0.131745637, 0.261150462, 0.388067803, 0.513189353, 0.636374668, 0.758087597, 0.878808958, 1, 1, 1, 1], degree=3))
            add(Edge.make_bspline(
                [(-0.607756225, -1.126240866), (-0.526341272, -1.032411706), (-0.369395008, -0.851534171), (-0.147005377, -0.58818052), (0.052485983, -0.342553042), (0.228461917, -0.115210972), (0.383373607, 0.093014827), (0.514393948, 0.283577403), (0.625301777, 0.454674177), (0.686096112, 0.565722807), (0.714359159, 0.617348878)],
                knots=[0, 0, 0, 0, 0.170005554, 0.327725258, 0.471696803, 0.603008639, 0.721148947, 0.826797124, 0.919478664, 1, 1, 1, 1], degree=3))
            add(Edge.make_bspline(
                [(-2.155833148, -3.076561379), (-2.120077921, -3.019555215), (-2.042967512, -2.896614628), (-1.906171622, -2.707469654), (-1.750693337, -2.493359905), (-1.565930664, -2.262250728), (-1.361697851, -2.006814917), (-1.131972057, -1.731572481), (-0.87885055, -1.434992601), (-0.700428862, -1.231786555), (-0.607756225, -1.126240866)],
                knots=[0, 0, 0, 0, 0.080973991, 0.174630064, 0.280853316, 0.39944862, 0.530692677, 0.674513651, 0.830941638, 1, 1, 1, 1], degree=3))
            Line((-2.155833148, -3.076561379), (-2.155833148, -3.566945994))
            Line((-2.155833148, -3.566945994), (2.664679672, -3.566945994))
            Line((2.664679672, -3.566945994), (2.869807877, -1.00284343))
            Line((2.869807877, -1.00284343), (2.339359159, -1.00284343))
        make_face()
    extrude(amount=WRAP1_DEPTH)


solid = part.part
